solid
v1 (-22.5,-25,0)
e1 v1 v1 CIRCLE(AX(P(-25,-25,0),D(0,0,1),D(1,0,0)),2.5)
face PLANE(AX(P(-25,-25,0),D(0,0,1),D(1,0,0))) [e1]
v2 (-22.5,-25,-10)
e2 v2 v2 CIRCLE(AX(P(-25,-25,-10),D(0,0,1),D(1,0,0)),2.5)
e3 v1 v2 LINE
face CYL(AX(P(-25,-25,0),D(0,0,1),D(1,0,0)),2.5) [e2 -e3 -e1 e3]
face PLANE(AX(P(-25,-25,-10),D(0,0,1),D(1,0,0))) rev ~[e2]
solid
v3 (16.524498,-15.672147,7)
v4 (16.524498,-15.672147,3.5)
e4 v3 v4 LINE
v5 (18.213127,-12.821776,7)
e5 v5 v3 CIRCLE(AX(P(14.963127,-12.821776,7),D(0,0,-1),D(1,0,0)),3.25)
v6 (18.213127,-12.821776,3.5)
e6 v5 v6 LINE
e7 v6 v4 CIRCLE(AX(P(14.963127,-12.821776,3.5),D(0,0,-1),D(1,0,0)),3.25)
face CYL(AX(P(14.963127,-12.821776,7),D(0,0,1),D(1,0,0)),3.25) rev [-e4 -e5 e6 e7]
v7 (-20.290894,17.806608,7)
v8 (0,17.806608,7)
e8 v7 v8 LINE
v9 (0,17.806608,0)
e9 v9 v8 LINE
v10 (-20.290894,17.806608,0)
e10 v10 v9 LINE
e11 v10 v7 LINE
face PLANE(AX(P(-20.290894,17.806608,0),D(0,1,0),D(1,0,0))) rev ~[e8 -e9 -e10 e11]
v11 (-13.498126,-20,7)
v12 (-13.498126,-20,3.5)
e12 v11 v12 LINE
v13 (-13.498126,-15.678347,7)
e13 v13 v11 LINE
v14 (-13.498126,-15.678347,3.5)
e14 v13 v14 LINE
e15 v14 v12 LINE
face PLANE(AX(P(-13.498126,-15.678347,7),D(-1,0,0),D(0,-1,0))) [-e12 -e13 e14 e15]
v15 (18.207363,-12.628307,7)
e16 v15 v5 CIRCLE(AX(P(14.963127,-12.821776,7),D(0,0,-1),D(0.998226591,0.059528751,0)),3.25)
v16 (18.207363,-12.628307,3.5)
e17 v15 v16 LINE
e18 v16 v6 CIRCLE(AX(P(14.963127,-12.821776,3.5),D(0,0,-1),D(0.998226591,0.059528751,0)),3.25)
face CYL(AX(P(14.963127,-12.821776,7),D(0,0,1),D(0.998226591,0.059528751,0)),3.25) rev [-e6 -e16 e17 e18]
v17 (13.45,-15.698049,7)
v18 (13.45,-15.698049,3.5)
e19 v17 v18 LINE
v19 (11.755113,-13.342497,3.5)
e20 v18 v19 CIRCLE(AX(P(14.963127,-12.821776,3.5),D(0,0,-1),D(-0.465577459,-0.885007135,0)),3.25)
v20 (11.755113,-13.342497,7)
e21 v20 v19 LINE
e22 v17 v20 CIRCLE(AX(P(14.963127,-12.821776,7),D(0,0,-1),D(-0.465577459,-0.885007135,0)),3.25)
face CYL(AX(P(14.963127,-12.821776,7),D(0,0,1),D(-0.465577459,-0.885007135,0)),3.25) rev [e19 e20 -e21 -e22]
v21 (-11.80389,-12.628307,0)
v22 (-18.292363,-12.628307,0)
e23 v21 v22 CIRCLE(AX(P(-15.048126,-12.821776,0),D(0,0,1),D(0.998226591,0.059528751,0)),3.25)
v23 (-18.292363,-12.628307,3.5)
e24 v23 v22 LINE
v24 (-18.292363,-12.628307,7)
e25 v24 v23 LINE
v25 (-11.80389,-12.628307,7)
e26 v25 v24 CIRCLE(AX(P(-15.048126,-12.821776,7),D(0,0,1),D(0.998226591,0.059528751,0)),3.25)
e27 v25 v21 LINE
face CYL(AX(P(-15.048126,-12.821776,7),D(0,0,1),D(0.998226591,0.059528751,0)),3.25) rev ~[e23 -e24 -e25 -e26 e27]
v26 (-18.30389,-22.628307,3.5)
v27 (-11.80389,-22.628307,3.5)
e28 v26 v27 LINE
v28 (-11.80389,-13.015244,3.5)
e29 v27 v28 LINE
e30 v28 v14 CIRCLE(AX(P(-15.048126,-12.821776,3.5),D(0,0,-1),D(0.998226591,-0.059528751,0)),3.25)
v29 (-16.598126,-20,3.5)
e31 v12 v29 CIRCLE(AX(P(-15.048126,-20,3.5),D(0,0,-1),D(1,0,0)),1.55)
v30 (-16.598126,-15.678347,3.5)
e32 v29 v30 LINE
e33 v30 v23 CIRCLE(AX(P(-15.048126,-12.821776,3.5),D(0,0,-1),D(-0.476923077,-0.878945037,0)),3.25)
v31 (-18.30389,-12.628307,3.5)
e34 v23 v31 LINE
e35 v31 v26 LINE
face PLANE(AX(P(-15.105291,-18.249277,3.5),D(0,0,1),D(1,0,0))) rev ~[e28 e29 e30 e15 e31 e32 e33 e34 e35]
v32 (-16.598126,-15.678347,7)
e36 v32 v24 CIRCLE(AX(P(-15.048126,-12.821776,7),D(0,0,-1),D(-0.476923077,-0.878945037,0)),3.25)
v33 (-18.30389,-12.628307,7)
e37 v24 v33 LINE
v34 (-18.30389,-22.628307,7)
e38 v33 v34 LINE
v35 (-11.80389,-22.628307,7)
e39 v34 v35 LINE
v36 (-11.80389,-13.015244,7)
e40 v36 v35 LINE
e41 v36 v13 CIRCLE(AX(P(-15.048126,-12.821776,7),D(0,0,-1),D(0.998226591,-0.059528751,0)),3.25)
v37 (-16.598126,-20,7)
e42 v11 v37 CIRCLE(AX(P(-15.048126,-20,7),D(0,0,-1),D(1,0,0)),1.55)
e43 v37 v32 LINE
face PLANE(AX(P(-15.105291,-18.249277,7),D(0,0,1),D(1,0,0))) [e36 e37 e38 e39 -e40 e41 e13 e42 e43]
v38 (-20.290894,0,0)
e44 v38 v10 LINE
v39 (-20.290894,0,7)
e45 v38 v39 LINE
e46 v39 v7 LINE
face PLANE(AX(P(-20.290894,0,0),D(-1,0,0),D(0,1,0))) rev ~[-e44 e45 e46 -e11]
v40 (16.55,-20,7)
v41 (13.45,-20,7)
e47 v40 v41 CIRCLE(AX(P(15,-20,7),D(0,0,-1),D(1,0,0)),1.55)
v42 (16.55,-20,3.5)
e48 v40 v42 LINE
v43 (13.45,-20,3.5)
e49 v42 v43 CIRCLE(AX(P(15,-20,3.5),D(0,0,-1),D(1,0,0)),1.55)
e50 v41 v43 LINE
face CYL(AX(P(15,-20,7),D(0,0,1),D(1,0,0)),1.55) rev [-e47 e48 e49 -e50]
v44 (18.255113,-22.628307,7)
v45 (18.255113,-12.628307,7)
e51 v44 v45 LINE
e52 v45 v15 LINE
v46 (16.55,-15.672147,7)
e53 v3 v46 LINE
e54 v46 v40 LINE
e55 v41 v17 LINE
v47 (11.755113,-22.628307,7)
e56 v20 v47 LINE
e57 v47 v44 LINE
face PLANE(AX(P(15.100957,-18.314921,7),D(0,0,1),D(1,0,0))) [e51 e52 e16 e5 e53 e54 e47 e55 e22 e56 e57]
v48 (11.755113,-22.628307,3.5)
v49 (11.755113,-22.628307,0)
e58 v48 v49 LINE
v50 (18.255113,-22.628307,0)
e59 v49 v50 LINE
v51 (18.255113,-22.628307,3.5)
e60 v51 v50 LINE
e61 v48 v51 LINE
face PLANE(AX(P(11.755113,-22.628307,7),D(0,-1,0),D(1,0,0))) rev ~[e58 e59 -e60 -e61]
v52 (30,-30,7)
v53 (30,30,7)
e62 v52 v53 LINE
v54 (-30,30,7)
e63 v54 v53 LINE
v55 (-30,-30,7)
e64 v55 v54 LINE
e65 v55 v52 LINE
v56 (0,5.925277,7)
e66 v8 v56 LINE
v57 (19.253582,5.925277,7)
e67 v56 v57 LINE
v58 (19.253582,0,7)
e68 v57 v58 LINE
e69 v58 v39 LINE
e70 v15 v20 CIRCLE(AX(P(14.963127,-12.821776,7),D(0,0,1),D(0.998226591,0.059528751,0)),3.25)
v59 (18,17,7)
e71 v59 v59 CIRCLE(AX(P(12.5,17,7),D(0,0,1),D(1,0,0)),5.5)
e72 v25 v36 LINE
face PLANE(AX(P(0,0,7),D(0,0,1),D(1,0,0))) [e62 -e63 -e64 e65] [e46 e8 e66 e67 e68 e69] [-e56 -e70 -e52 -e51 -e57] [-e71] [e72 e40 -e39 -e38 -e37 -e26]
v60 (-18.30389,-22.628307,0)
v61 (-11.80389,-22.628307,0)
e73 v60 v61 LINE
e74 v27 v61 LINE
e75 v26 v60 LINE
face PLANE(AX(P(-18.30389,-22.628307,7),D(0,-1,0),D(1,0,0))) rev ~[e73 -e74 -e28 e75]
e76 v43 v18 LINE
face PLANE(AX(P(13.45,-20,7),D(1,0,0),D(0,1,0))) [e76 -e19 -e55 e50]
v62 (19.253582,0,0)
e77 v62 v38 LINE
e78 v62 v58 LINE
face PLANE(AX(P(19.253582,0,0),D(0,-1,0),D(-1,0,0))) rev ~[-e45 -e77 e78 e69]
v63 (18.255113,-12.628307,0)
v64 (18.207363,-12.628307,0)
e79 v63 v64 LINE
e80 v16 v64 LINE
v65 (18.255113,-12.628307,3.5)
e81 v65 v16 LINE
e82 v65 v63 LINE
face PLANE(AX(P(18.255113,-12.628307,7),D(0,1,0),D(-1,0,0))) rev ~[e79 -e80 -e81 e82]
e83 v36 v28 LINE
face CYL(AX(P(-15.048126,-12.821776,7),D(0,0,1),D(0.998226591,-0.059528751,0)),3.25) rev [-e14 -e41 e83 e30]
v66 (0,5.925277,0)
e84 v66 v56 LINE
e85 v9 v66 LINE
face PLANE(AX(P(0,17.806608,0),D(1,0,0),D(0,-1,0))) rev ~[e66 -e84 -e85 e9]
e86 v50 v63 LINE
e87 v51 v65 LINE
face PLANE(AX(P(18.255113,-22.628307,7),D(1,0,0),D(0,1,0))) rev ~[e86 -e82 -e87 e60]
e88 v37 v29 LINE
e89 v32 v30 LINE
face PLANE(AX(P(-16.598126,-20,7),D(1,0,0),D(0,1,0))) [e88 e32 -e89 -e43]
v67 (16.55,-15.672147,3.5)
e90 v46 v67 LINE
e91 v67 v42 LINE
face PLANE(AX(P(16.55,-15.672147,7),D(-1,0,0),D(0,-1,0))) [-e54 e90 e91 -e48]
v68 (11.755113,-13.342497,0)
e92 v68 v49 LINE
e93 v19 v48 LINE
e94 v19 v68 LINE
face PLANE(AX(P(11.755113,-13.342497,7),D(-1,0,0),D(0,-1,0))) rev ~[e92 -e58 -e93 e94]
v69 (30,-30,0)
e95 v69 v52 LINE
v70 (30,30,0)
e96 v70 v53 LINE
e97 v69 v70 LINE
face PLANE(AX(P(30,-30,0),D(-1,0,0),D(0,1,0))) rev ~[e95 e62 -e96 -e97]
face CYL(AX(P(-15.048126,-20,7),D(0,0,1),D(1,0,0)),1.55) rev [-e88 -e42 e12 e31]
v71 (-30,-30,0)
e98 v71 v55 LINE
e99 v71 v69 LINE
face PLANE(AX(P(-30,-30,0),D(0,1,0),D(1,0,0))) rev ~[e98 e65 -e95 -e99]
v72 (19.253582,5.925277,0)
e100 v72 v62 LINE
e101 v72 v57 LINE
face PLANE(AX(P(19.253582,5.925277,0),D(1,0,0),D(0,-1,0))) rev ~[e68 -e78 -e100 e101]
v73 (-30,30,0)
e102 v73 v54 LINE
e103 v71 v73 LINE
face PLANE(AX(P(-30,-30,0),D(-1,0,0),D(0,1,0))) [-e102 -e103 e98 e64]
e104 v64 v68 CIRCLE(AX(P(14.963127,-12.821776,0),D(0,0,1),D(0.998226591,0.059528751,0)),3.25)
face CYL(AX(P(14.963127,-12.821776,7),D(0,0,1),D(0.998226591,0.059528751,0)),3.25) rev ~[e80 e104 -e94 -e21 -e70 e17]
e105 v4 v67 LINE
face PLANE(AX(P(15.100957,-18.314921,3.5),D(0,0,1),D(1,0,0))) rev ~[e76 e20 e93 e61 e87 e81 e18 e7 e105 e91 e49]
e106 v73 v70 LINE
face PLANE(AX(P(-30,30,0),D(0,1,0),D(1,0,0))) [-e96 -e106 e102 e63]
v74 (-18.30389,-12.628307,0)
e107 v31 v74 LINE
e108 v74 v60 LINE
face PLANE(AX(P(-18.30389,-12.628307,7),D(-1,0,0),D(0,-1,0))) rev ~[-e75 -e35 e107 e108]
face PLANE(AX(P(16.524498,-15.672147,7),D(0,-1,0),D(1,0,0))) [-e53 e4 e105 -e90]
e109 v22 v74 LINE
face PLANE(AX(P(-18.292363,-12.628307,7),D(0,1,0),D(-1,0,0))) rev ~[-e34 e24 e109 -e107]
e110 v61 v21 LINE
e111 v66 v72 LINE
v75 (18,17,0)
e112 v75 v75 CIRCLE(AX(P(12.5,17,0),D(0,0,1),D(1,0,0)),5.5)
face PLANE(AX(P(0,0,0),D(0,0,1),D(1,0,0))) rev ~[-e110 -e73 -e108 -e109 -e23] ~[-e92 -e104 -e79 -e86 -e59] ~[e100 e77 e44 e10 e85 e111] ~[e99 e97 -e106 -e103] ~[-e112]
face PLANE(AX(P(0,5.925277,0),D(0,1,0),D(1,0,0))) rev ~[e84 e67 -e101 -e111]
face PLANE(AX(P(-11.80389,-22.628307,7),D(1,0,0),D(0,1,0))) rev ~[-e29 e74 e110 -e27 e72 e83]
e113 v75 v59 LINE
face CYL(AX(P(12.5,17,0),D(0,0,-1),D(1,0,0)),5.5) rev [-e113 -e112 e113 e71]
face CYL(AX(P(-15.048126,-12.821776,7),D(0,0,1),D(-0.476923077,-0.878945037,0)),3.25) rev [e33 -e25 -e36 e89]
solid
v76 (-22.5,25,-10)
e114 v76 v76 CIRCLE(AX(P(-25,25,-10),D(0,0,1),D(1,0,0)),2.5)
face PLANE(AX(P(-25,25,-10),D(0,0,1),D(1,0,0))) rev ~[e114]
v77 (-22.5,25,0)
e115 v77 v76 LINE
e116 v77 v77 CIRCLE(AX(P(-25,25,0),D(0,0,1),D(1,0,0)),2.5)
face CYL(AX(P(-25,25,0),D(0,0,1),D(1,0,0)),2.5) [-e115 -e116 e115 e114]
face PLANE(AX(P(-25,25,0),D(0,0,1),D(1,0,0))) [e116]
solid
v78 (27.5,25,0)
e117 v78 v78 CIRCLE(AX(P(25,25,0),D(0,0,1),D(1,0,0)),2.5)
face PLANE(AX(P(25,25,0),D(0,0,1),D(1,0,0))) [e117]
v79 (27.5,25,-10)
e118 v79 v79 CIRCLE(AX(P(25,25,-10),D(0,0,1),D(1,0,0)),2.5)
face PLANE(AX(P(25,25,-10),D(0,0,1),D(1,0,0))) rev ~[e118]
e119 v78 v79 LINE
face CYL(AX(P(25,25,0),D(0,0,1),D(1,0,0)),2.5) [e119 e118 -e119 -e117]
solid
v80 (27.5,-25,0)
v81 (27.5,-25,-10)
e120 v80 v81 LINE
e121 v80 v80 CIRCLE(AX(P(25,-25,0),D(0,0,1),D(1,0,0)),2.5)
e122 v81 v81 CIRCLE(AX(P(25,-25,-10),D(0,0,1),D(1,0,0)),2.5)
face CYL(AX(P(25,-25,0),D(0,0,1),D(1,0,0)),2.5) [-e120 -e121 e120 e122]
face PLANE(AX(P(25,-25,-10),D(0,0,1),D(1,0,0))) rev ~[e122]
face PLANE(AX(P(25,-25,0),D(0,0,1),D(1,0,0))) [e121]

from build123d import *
from build123d import SkipClean  # not in build123d's __all__

# Parameters (mm, degrees)
F0_R     = 2.5
F1_DEPTH = 10
F0_W     = 60
F0_H     = 60
F0_R_2   = 5.5
F2_DEPTH = 7
F4_DEPTH = 25
F5_DEPTH = 10
F6_DEPTH = 3.5


with BuildPart() as f1:
    # F0 (on Top) → F1 (new body)
    with BuildSketch(Plane.XY):
        with Locations((-25, 25)):
            Circle(F0_R)
    extrude(amount=-F1_DEPTH)


with BuildPart() as f1b:
    # F0 (on Top) → F1, piece 2 (new body)
    with BuildSketch(Plane.XY):
        with Locations((25, 25)):
            Circle(F0_R)
    extrude(amount=-F1_DEPTH)


with BuildPart() as f1c:
    # F0 (on Top) → F1, piece 3 (new body)
    with BuildSketch(Plane.XY):
        with Locations((25, -25)):
            Circle(F0_R)
    extrude(amount=-F1_DEPTH)


with BuildPart() as f1d:
    # F0 (on Top) → F1, piece 4 (new body)
    with BuildSketch(Plane.XY):
        with Locations((-25, -25)):
            Circle(F0_R)
    extrude(amount=-F1_DEPTH)


with BuildPart() as f2:
    # F0 (on Top) → F2 (new body)
    with BuildSketch(Plane.XY):
        Rectangle(F0_W, F0_H)
        with Locations((-25, -25)):
            Circle(F0_R, mode=Mode.SUBTRACT)
        with Locations((25, -25)):
            Circle(F0_R, mode=Mode.SUBTRACT)
        Polygon((-20.2908944339, 5.9252767824), (-20.2908944339, 17.8066082299), (0, 17.8066082299), (0, 5.9252767824), (19.2535817623, 5.9252767824), (19.2535817623, 0), (0, 0), (-20.2908944339, 0), align=None, mode=Mode.SUBTRACT)
        with Locations((-25, 25)):
            Circle(F0_R, mode=Mode.SUBTRACT)
        with Locations((12.5, 17)):
            Circle(F0_R_2, mode=Mode.SUBTRACT)
        with Locations((25, 25)):
            Circle(F0_R, mode=Mode.SUBTRACT)
        with Locations((-25, 25)):
            Circle(F0_R)
        with Locations((-25, -25)):
            Circle(F0_R)
        with Locations((25, -25)):
            Circle(F0_R)
        with Locations((25, 25)):
            Circle(F0_R)
    extrude(amount=F2_DEPTH)

    # F3 (on face) → F4 (cut)
    with BuildSketch(Plane.XY.offset(7)):
        with BuildLine():
            Line((13.45, -20), (16.55, -20))
            ThreePointArc((16.55, -20), (15, -18.45), (13.45, -20))
        make_face()
        with BuildLine():
            ThreePointArc((13.45, -20), (15, -21.55), (16.55, -20))
            Line((16.55, -20), (13.45, -20))
        make_face()
        with BuildLine():
            ThreePointArc((13.45, -20), (15, -18.45), (16.55, -20))
            Line((16.55, -20), (16.55, -15.6721474181))
            Line((16.55, -15.6721474181), (16.5244984301, -15.6721474181))
            ThreePointArc((16.5244984301, -15.6721474181), (14.9905058647, -16.0716604569), (13.45, -15.6980489747))
            Line((13.45, -15.6980489747), (13.45, -20))
        make_face()
        with BuildLine():
            ThreePointArc((11.7551134899, -13.3424973788), (12.3250504464, -14.7199468679), (13.45, -15.6980489747))
            Line((13.45, -15.6980489747), (13.45, -15.6721474181))
            Line((13.45, -15.6721474181), (16.5244984301, -15.6721474181))
            ThreePointArc((16.5244984301, -15.6721474181), (17.7592810637, -14.4782844642), (18.2131267413, -12.8217757846))
            ThreePointArc((18.2131267413, -12.8217757846), (18.2116855273, -12.7249986477), (18.2073631634, -12.6283073425))
            Line((18.2073631634, -12.6283073425), (11.7551134899, -12.6283073425))
            Line((11.7551134899, -12.6283073425), (11.7551134899, -13.3424973788))
        make_face()
        with BuildLine():
            Line((13.45, -15.6721474181), (13.45, -15.6980489747))
            ThreePointArc((13.45, -15.6980489747), (14.9905058647, -16.0716604569), (16.5244984301, -15.6721474181))
            Line((16.5244984301, -15.6721474181), (13.45, -15.6721474181))
        make_face()
        with BuildLine():
            ThreePointArc((18.2073631634, -12.6283073425), (14.6055727154, -9.5915041058), (11.7551134899, -13.3424973788))
            Line((11.7551134899, -13.3424973788), (11.7551134899, -12.6283073425))
            Line((11.7551134899, -12.6283073425), (18.2073631634, -12.6283073425))
        make_face()
        with BuildLine():
            Line((-16.5981262033, -20), (-13.4981262033, -20))
            ThreePointArc((-13.4981262033, -20), (-15.0481262033, -18.45), (-16.5981262033, -20))
        make_face()
        with BuildLine():
            ThreePointArc((-16.5981262033, -20), (-15.0481262033, -21.55), (-13.4981262033, -20))
            Line((-13.4981262033, -20), (-16.5981262033, -20))
        make_face()
        with BuildLine():
            ThreePointArc((-16.5981262033, -20), (-15.0481262033, -18.45), (-13.4981262033, -20))
            Line((-13.4981262033, -20), (-13.4981262033, -15.678347156))
            ThreePointArc((-13.4981262033, -15.678347156), (-15.0481262033, -16.0717757846), (-16.5981262033, -15.678347156))
            Line((-16.5981262033, -15.678347156), (-16.5981262033, -20))
        make_face()
        with BuildLine():
            Line((-16.5981262033, -15.678347156), (-13.4981262033, -15.678347156))
            ThreePointArc((-13.4981262033, -15.678347156), (-12.3060093165, -14.5662800062), (-11.8038897812, -13.0152442266))
            Line((-11.8038897812, -13.0152442266), (-11.8038897812, -12.6283073425))
            Line((-11.8038897812, -12.6283073425), (-18.2923626253, -12.6283073425))
            ThreePointArc((-18.2923626253, -12.6283073425), (-17.8892283544, -14.3999514929), (-16.5981262033, -15.678347156))
        make_face()
        with BuildLine():
            ThreePointArc((-16.5981262033, -15.678347156), (-15.0481262033, -16.0717757846), (-13.4981262033, -15.678347156))
            Line((-13.4981262033, -15.678347156), (-16.5981262033, -15.678347156))
        make_face()
    extrude(amount=-F4_DEPTH, mode=Mode.SUBTRACT)

    # F3 (on face) → F5 (cut)
    with BuildSketch(Plane.XY.offset(7)):
        with BuildLine():
            Line((16.55, -15.6721474181), (16.55, -20))
            ThreePointArc((16.55, -20), (15, -21.55), (13.45, -20))
            Line((13.45, -20), (13.45, -15.6980489747))
            ThreePointArc((13.45, -15.6980489747), (12.3250504464, -14.7199468679), (11.7551134899, -13.3424973788))
            Line((11.7551134899, -13.3424973788), (11.7551134899, -22.6283073425))
            Line((11.7551134899, -22.6283073425), (18.2551134899, -22.6283073425))
            Line((18.2551134899, -22.6283073425), (18.2551134899, -12.6283073425))
            Line((18.2551134899, -12.6283073425), (18.2073631634, -12.6283073425))
            ThreePointArc((18.2073631634, -12.6283073425), (18.2116855273, -12.7249986477), (18.2131267413, -12.8217757846))
            ThreePointArc((18.2131267413, -12.8217757846), (17.7592810637, -14.4782844642), (16.5244984301, -15.6721474181))
            Line((16.5244984301, -15.6721474181), (16.55, -15.6721474181))
        make_face()
        with BuildLine():
            Line((-13.4981262033, -15.678347156), (-13.4981262033, -20))
            ThreePointArc((-13.4981262033, -20), (-15.0481262033, -21.55), (-16.5981262033, -20))
            Line((-16.5981262033, -20), (-16.5981262033, -15.678347156))
            ThreePointArc((-16.5981262033, -15.678347156), (-17.8892283544, -14.3999514929), (-18.2923626253, -12.6283073425))
            Line((-18.2923626253, -12.6283073425), (-18.3038897812, -12.6283073425))
            Line((-18.3038897812, -12.6283073425), (-18.3038897812, -22.6283073425))
            Line((-18.3038897812, -22.6283073425), (-11.8038897812, -22.6283073425))
            Line((-11.8038897812, -22.6283073425), (-11.8038897812, -13.0152442266))
            ThreePointArc((-11.8038897812, -13.0152442266), (-12.3060093165, -14.5662800062), (-13.4981262033, -15.678347156))
        make_face()
        with BuildLine():
            ThreePointArc((-11.8038897812, -12.6283073425), (-15.0481262033, -9.5717757846), (-18.2923626253, -12.6283073425))
            Line((-18.2923626253, -12.6283073425), (-11.8038897812, -12.6283073425))
        make_face()
    extrude(amount=-F5_DEPTH, mode=Mode.SUBTRACT)

    # F3 (on face) → F6 (join)
    with BuildSketch(Plane.XY.offset(7)):
        with BuildLine():
            Line((-13.4981262033, -15.678347156), (-13.4981262033, -20))
            ThreePointArc((-13.4981262033, -20), (-15.0481262033, -21.55), (-16.5981262033, -20))
            Line((-16.5981262033, -20), (-16.5981262033, -15.678347156))
            ThreePointArc((-16.5981262033, -15.678347156), (-17.8892283544, -14.3999514929), (-18.2923626253, -12.6283073425))
            Line((-18.2923626253, -12.6283073425), (-18.3038897812, -12.6283073425))
            Line((-18.3038897812, -12.6283073425), (-18.3038897812, -22.6283073425))
            Line((-18.3038897812, -22.6283073425), (-11.8038897812, -22.6283073425))
            Line((-11.8038897812, -22.6283073425), (-11.8038897812, -13.0152442266))
            ThreePointArc((-11.8038897812, -13.0152442266), (-12.3060093165, -14.5662800062), (-13.4981262033, -15.678347156))
        make_face()
        with BuildLine():
            Line((16.55, -15.6721474181), (16.55, -20))
            ThreePointArc((16.55, -20), (15, -21.55), (13.45, -20))
            Line((13.45, -20), (13.45, -15.6980489747))
            ThreePointArc((13.45, -15.6980489747), (12.3250504464, -14.7199468679), (11.7551134899, -13.3424973788))
            Line((11.7551134899, -13.3424973788), (11.7551134899, -22.6283073425))
            Line((11.7551134899, -22.6283073425), (18.2551134899, -22.6283073425))
            Line((18.2551134899, -22.6283073425), (18.2551134899, -12.6283073425))
            Line((18.2551134899, -12.6283073425), (18.2073631634, -12.6283073425))
            ThreePointArc((18.2073631634, -12.6283073425), (18.2116855273, -12.7249986477), (18.2131267413, -12.8217757846))
            ThreePointArc((18.2131267413, -12.8217757846), (17.7592810637, -14.4782844642), (16.5244984301, -15.6721474181))
            Line((16.5244984301, -15.6721474181), (16.55, -15.6721474181))
        make_face()
    with SkipClean():  # cleaning this boolean's faces spoils the solid; the shape is the same uncleaned
        extrude(amount=-F6_DEPTH)


solid = Compound([f1.part, f1b.part, f1c.part, f1d.part, f2.part])
